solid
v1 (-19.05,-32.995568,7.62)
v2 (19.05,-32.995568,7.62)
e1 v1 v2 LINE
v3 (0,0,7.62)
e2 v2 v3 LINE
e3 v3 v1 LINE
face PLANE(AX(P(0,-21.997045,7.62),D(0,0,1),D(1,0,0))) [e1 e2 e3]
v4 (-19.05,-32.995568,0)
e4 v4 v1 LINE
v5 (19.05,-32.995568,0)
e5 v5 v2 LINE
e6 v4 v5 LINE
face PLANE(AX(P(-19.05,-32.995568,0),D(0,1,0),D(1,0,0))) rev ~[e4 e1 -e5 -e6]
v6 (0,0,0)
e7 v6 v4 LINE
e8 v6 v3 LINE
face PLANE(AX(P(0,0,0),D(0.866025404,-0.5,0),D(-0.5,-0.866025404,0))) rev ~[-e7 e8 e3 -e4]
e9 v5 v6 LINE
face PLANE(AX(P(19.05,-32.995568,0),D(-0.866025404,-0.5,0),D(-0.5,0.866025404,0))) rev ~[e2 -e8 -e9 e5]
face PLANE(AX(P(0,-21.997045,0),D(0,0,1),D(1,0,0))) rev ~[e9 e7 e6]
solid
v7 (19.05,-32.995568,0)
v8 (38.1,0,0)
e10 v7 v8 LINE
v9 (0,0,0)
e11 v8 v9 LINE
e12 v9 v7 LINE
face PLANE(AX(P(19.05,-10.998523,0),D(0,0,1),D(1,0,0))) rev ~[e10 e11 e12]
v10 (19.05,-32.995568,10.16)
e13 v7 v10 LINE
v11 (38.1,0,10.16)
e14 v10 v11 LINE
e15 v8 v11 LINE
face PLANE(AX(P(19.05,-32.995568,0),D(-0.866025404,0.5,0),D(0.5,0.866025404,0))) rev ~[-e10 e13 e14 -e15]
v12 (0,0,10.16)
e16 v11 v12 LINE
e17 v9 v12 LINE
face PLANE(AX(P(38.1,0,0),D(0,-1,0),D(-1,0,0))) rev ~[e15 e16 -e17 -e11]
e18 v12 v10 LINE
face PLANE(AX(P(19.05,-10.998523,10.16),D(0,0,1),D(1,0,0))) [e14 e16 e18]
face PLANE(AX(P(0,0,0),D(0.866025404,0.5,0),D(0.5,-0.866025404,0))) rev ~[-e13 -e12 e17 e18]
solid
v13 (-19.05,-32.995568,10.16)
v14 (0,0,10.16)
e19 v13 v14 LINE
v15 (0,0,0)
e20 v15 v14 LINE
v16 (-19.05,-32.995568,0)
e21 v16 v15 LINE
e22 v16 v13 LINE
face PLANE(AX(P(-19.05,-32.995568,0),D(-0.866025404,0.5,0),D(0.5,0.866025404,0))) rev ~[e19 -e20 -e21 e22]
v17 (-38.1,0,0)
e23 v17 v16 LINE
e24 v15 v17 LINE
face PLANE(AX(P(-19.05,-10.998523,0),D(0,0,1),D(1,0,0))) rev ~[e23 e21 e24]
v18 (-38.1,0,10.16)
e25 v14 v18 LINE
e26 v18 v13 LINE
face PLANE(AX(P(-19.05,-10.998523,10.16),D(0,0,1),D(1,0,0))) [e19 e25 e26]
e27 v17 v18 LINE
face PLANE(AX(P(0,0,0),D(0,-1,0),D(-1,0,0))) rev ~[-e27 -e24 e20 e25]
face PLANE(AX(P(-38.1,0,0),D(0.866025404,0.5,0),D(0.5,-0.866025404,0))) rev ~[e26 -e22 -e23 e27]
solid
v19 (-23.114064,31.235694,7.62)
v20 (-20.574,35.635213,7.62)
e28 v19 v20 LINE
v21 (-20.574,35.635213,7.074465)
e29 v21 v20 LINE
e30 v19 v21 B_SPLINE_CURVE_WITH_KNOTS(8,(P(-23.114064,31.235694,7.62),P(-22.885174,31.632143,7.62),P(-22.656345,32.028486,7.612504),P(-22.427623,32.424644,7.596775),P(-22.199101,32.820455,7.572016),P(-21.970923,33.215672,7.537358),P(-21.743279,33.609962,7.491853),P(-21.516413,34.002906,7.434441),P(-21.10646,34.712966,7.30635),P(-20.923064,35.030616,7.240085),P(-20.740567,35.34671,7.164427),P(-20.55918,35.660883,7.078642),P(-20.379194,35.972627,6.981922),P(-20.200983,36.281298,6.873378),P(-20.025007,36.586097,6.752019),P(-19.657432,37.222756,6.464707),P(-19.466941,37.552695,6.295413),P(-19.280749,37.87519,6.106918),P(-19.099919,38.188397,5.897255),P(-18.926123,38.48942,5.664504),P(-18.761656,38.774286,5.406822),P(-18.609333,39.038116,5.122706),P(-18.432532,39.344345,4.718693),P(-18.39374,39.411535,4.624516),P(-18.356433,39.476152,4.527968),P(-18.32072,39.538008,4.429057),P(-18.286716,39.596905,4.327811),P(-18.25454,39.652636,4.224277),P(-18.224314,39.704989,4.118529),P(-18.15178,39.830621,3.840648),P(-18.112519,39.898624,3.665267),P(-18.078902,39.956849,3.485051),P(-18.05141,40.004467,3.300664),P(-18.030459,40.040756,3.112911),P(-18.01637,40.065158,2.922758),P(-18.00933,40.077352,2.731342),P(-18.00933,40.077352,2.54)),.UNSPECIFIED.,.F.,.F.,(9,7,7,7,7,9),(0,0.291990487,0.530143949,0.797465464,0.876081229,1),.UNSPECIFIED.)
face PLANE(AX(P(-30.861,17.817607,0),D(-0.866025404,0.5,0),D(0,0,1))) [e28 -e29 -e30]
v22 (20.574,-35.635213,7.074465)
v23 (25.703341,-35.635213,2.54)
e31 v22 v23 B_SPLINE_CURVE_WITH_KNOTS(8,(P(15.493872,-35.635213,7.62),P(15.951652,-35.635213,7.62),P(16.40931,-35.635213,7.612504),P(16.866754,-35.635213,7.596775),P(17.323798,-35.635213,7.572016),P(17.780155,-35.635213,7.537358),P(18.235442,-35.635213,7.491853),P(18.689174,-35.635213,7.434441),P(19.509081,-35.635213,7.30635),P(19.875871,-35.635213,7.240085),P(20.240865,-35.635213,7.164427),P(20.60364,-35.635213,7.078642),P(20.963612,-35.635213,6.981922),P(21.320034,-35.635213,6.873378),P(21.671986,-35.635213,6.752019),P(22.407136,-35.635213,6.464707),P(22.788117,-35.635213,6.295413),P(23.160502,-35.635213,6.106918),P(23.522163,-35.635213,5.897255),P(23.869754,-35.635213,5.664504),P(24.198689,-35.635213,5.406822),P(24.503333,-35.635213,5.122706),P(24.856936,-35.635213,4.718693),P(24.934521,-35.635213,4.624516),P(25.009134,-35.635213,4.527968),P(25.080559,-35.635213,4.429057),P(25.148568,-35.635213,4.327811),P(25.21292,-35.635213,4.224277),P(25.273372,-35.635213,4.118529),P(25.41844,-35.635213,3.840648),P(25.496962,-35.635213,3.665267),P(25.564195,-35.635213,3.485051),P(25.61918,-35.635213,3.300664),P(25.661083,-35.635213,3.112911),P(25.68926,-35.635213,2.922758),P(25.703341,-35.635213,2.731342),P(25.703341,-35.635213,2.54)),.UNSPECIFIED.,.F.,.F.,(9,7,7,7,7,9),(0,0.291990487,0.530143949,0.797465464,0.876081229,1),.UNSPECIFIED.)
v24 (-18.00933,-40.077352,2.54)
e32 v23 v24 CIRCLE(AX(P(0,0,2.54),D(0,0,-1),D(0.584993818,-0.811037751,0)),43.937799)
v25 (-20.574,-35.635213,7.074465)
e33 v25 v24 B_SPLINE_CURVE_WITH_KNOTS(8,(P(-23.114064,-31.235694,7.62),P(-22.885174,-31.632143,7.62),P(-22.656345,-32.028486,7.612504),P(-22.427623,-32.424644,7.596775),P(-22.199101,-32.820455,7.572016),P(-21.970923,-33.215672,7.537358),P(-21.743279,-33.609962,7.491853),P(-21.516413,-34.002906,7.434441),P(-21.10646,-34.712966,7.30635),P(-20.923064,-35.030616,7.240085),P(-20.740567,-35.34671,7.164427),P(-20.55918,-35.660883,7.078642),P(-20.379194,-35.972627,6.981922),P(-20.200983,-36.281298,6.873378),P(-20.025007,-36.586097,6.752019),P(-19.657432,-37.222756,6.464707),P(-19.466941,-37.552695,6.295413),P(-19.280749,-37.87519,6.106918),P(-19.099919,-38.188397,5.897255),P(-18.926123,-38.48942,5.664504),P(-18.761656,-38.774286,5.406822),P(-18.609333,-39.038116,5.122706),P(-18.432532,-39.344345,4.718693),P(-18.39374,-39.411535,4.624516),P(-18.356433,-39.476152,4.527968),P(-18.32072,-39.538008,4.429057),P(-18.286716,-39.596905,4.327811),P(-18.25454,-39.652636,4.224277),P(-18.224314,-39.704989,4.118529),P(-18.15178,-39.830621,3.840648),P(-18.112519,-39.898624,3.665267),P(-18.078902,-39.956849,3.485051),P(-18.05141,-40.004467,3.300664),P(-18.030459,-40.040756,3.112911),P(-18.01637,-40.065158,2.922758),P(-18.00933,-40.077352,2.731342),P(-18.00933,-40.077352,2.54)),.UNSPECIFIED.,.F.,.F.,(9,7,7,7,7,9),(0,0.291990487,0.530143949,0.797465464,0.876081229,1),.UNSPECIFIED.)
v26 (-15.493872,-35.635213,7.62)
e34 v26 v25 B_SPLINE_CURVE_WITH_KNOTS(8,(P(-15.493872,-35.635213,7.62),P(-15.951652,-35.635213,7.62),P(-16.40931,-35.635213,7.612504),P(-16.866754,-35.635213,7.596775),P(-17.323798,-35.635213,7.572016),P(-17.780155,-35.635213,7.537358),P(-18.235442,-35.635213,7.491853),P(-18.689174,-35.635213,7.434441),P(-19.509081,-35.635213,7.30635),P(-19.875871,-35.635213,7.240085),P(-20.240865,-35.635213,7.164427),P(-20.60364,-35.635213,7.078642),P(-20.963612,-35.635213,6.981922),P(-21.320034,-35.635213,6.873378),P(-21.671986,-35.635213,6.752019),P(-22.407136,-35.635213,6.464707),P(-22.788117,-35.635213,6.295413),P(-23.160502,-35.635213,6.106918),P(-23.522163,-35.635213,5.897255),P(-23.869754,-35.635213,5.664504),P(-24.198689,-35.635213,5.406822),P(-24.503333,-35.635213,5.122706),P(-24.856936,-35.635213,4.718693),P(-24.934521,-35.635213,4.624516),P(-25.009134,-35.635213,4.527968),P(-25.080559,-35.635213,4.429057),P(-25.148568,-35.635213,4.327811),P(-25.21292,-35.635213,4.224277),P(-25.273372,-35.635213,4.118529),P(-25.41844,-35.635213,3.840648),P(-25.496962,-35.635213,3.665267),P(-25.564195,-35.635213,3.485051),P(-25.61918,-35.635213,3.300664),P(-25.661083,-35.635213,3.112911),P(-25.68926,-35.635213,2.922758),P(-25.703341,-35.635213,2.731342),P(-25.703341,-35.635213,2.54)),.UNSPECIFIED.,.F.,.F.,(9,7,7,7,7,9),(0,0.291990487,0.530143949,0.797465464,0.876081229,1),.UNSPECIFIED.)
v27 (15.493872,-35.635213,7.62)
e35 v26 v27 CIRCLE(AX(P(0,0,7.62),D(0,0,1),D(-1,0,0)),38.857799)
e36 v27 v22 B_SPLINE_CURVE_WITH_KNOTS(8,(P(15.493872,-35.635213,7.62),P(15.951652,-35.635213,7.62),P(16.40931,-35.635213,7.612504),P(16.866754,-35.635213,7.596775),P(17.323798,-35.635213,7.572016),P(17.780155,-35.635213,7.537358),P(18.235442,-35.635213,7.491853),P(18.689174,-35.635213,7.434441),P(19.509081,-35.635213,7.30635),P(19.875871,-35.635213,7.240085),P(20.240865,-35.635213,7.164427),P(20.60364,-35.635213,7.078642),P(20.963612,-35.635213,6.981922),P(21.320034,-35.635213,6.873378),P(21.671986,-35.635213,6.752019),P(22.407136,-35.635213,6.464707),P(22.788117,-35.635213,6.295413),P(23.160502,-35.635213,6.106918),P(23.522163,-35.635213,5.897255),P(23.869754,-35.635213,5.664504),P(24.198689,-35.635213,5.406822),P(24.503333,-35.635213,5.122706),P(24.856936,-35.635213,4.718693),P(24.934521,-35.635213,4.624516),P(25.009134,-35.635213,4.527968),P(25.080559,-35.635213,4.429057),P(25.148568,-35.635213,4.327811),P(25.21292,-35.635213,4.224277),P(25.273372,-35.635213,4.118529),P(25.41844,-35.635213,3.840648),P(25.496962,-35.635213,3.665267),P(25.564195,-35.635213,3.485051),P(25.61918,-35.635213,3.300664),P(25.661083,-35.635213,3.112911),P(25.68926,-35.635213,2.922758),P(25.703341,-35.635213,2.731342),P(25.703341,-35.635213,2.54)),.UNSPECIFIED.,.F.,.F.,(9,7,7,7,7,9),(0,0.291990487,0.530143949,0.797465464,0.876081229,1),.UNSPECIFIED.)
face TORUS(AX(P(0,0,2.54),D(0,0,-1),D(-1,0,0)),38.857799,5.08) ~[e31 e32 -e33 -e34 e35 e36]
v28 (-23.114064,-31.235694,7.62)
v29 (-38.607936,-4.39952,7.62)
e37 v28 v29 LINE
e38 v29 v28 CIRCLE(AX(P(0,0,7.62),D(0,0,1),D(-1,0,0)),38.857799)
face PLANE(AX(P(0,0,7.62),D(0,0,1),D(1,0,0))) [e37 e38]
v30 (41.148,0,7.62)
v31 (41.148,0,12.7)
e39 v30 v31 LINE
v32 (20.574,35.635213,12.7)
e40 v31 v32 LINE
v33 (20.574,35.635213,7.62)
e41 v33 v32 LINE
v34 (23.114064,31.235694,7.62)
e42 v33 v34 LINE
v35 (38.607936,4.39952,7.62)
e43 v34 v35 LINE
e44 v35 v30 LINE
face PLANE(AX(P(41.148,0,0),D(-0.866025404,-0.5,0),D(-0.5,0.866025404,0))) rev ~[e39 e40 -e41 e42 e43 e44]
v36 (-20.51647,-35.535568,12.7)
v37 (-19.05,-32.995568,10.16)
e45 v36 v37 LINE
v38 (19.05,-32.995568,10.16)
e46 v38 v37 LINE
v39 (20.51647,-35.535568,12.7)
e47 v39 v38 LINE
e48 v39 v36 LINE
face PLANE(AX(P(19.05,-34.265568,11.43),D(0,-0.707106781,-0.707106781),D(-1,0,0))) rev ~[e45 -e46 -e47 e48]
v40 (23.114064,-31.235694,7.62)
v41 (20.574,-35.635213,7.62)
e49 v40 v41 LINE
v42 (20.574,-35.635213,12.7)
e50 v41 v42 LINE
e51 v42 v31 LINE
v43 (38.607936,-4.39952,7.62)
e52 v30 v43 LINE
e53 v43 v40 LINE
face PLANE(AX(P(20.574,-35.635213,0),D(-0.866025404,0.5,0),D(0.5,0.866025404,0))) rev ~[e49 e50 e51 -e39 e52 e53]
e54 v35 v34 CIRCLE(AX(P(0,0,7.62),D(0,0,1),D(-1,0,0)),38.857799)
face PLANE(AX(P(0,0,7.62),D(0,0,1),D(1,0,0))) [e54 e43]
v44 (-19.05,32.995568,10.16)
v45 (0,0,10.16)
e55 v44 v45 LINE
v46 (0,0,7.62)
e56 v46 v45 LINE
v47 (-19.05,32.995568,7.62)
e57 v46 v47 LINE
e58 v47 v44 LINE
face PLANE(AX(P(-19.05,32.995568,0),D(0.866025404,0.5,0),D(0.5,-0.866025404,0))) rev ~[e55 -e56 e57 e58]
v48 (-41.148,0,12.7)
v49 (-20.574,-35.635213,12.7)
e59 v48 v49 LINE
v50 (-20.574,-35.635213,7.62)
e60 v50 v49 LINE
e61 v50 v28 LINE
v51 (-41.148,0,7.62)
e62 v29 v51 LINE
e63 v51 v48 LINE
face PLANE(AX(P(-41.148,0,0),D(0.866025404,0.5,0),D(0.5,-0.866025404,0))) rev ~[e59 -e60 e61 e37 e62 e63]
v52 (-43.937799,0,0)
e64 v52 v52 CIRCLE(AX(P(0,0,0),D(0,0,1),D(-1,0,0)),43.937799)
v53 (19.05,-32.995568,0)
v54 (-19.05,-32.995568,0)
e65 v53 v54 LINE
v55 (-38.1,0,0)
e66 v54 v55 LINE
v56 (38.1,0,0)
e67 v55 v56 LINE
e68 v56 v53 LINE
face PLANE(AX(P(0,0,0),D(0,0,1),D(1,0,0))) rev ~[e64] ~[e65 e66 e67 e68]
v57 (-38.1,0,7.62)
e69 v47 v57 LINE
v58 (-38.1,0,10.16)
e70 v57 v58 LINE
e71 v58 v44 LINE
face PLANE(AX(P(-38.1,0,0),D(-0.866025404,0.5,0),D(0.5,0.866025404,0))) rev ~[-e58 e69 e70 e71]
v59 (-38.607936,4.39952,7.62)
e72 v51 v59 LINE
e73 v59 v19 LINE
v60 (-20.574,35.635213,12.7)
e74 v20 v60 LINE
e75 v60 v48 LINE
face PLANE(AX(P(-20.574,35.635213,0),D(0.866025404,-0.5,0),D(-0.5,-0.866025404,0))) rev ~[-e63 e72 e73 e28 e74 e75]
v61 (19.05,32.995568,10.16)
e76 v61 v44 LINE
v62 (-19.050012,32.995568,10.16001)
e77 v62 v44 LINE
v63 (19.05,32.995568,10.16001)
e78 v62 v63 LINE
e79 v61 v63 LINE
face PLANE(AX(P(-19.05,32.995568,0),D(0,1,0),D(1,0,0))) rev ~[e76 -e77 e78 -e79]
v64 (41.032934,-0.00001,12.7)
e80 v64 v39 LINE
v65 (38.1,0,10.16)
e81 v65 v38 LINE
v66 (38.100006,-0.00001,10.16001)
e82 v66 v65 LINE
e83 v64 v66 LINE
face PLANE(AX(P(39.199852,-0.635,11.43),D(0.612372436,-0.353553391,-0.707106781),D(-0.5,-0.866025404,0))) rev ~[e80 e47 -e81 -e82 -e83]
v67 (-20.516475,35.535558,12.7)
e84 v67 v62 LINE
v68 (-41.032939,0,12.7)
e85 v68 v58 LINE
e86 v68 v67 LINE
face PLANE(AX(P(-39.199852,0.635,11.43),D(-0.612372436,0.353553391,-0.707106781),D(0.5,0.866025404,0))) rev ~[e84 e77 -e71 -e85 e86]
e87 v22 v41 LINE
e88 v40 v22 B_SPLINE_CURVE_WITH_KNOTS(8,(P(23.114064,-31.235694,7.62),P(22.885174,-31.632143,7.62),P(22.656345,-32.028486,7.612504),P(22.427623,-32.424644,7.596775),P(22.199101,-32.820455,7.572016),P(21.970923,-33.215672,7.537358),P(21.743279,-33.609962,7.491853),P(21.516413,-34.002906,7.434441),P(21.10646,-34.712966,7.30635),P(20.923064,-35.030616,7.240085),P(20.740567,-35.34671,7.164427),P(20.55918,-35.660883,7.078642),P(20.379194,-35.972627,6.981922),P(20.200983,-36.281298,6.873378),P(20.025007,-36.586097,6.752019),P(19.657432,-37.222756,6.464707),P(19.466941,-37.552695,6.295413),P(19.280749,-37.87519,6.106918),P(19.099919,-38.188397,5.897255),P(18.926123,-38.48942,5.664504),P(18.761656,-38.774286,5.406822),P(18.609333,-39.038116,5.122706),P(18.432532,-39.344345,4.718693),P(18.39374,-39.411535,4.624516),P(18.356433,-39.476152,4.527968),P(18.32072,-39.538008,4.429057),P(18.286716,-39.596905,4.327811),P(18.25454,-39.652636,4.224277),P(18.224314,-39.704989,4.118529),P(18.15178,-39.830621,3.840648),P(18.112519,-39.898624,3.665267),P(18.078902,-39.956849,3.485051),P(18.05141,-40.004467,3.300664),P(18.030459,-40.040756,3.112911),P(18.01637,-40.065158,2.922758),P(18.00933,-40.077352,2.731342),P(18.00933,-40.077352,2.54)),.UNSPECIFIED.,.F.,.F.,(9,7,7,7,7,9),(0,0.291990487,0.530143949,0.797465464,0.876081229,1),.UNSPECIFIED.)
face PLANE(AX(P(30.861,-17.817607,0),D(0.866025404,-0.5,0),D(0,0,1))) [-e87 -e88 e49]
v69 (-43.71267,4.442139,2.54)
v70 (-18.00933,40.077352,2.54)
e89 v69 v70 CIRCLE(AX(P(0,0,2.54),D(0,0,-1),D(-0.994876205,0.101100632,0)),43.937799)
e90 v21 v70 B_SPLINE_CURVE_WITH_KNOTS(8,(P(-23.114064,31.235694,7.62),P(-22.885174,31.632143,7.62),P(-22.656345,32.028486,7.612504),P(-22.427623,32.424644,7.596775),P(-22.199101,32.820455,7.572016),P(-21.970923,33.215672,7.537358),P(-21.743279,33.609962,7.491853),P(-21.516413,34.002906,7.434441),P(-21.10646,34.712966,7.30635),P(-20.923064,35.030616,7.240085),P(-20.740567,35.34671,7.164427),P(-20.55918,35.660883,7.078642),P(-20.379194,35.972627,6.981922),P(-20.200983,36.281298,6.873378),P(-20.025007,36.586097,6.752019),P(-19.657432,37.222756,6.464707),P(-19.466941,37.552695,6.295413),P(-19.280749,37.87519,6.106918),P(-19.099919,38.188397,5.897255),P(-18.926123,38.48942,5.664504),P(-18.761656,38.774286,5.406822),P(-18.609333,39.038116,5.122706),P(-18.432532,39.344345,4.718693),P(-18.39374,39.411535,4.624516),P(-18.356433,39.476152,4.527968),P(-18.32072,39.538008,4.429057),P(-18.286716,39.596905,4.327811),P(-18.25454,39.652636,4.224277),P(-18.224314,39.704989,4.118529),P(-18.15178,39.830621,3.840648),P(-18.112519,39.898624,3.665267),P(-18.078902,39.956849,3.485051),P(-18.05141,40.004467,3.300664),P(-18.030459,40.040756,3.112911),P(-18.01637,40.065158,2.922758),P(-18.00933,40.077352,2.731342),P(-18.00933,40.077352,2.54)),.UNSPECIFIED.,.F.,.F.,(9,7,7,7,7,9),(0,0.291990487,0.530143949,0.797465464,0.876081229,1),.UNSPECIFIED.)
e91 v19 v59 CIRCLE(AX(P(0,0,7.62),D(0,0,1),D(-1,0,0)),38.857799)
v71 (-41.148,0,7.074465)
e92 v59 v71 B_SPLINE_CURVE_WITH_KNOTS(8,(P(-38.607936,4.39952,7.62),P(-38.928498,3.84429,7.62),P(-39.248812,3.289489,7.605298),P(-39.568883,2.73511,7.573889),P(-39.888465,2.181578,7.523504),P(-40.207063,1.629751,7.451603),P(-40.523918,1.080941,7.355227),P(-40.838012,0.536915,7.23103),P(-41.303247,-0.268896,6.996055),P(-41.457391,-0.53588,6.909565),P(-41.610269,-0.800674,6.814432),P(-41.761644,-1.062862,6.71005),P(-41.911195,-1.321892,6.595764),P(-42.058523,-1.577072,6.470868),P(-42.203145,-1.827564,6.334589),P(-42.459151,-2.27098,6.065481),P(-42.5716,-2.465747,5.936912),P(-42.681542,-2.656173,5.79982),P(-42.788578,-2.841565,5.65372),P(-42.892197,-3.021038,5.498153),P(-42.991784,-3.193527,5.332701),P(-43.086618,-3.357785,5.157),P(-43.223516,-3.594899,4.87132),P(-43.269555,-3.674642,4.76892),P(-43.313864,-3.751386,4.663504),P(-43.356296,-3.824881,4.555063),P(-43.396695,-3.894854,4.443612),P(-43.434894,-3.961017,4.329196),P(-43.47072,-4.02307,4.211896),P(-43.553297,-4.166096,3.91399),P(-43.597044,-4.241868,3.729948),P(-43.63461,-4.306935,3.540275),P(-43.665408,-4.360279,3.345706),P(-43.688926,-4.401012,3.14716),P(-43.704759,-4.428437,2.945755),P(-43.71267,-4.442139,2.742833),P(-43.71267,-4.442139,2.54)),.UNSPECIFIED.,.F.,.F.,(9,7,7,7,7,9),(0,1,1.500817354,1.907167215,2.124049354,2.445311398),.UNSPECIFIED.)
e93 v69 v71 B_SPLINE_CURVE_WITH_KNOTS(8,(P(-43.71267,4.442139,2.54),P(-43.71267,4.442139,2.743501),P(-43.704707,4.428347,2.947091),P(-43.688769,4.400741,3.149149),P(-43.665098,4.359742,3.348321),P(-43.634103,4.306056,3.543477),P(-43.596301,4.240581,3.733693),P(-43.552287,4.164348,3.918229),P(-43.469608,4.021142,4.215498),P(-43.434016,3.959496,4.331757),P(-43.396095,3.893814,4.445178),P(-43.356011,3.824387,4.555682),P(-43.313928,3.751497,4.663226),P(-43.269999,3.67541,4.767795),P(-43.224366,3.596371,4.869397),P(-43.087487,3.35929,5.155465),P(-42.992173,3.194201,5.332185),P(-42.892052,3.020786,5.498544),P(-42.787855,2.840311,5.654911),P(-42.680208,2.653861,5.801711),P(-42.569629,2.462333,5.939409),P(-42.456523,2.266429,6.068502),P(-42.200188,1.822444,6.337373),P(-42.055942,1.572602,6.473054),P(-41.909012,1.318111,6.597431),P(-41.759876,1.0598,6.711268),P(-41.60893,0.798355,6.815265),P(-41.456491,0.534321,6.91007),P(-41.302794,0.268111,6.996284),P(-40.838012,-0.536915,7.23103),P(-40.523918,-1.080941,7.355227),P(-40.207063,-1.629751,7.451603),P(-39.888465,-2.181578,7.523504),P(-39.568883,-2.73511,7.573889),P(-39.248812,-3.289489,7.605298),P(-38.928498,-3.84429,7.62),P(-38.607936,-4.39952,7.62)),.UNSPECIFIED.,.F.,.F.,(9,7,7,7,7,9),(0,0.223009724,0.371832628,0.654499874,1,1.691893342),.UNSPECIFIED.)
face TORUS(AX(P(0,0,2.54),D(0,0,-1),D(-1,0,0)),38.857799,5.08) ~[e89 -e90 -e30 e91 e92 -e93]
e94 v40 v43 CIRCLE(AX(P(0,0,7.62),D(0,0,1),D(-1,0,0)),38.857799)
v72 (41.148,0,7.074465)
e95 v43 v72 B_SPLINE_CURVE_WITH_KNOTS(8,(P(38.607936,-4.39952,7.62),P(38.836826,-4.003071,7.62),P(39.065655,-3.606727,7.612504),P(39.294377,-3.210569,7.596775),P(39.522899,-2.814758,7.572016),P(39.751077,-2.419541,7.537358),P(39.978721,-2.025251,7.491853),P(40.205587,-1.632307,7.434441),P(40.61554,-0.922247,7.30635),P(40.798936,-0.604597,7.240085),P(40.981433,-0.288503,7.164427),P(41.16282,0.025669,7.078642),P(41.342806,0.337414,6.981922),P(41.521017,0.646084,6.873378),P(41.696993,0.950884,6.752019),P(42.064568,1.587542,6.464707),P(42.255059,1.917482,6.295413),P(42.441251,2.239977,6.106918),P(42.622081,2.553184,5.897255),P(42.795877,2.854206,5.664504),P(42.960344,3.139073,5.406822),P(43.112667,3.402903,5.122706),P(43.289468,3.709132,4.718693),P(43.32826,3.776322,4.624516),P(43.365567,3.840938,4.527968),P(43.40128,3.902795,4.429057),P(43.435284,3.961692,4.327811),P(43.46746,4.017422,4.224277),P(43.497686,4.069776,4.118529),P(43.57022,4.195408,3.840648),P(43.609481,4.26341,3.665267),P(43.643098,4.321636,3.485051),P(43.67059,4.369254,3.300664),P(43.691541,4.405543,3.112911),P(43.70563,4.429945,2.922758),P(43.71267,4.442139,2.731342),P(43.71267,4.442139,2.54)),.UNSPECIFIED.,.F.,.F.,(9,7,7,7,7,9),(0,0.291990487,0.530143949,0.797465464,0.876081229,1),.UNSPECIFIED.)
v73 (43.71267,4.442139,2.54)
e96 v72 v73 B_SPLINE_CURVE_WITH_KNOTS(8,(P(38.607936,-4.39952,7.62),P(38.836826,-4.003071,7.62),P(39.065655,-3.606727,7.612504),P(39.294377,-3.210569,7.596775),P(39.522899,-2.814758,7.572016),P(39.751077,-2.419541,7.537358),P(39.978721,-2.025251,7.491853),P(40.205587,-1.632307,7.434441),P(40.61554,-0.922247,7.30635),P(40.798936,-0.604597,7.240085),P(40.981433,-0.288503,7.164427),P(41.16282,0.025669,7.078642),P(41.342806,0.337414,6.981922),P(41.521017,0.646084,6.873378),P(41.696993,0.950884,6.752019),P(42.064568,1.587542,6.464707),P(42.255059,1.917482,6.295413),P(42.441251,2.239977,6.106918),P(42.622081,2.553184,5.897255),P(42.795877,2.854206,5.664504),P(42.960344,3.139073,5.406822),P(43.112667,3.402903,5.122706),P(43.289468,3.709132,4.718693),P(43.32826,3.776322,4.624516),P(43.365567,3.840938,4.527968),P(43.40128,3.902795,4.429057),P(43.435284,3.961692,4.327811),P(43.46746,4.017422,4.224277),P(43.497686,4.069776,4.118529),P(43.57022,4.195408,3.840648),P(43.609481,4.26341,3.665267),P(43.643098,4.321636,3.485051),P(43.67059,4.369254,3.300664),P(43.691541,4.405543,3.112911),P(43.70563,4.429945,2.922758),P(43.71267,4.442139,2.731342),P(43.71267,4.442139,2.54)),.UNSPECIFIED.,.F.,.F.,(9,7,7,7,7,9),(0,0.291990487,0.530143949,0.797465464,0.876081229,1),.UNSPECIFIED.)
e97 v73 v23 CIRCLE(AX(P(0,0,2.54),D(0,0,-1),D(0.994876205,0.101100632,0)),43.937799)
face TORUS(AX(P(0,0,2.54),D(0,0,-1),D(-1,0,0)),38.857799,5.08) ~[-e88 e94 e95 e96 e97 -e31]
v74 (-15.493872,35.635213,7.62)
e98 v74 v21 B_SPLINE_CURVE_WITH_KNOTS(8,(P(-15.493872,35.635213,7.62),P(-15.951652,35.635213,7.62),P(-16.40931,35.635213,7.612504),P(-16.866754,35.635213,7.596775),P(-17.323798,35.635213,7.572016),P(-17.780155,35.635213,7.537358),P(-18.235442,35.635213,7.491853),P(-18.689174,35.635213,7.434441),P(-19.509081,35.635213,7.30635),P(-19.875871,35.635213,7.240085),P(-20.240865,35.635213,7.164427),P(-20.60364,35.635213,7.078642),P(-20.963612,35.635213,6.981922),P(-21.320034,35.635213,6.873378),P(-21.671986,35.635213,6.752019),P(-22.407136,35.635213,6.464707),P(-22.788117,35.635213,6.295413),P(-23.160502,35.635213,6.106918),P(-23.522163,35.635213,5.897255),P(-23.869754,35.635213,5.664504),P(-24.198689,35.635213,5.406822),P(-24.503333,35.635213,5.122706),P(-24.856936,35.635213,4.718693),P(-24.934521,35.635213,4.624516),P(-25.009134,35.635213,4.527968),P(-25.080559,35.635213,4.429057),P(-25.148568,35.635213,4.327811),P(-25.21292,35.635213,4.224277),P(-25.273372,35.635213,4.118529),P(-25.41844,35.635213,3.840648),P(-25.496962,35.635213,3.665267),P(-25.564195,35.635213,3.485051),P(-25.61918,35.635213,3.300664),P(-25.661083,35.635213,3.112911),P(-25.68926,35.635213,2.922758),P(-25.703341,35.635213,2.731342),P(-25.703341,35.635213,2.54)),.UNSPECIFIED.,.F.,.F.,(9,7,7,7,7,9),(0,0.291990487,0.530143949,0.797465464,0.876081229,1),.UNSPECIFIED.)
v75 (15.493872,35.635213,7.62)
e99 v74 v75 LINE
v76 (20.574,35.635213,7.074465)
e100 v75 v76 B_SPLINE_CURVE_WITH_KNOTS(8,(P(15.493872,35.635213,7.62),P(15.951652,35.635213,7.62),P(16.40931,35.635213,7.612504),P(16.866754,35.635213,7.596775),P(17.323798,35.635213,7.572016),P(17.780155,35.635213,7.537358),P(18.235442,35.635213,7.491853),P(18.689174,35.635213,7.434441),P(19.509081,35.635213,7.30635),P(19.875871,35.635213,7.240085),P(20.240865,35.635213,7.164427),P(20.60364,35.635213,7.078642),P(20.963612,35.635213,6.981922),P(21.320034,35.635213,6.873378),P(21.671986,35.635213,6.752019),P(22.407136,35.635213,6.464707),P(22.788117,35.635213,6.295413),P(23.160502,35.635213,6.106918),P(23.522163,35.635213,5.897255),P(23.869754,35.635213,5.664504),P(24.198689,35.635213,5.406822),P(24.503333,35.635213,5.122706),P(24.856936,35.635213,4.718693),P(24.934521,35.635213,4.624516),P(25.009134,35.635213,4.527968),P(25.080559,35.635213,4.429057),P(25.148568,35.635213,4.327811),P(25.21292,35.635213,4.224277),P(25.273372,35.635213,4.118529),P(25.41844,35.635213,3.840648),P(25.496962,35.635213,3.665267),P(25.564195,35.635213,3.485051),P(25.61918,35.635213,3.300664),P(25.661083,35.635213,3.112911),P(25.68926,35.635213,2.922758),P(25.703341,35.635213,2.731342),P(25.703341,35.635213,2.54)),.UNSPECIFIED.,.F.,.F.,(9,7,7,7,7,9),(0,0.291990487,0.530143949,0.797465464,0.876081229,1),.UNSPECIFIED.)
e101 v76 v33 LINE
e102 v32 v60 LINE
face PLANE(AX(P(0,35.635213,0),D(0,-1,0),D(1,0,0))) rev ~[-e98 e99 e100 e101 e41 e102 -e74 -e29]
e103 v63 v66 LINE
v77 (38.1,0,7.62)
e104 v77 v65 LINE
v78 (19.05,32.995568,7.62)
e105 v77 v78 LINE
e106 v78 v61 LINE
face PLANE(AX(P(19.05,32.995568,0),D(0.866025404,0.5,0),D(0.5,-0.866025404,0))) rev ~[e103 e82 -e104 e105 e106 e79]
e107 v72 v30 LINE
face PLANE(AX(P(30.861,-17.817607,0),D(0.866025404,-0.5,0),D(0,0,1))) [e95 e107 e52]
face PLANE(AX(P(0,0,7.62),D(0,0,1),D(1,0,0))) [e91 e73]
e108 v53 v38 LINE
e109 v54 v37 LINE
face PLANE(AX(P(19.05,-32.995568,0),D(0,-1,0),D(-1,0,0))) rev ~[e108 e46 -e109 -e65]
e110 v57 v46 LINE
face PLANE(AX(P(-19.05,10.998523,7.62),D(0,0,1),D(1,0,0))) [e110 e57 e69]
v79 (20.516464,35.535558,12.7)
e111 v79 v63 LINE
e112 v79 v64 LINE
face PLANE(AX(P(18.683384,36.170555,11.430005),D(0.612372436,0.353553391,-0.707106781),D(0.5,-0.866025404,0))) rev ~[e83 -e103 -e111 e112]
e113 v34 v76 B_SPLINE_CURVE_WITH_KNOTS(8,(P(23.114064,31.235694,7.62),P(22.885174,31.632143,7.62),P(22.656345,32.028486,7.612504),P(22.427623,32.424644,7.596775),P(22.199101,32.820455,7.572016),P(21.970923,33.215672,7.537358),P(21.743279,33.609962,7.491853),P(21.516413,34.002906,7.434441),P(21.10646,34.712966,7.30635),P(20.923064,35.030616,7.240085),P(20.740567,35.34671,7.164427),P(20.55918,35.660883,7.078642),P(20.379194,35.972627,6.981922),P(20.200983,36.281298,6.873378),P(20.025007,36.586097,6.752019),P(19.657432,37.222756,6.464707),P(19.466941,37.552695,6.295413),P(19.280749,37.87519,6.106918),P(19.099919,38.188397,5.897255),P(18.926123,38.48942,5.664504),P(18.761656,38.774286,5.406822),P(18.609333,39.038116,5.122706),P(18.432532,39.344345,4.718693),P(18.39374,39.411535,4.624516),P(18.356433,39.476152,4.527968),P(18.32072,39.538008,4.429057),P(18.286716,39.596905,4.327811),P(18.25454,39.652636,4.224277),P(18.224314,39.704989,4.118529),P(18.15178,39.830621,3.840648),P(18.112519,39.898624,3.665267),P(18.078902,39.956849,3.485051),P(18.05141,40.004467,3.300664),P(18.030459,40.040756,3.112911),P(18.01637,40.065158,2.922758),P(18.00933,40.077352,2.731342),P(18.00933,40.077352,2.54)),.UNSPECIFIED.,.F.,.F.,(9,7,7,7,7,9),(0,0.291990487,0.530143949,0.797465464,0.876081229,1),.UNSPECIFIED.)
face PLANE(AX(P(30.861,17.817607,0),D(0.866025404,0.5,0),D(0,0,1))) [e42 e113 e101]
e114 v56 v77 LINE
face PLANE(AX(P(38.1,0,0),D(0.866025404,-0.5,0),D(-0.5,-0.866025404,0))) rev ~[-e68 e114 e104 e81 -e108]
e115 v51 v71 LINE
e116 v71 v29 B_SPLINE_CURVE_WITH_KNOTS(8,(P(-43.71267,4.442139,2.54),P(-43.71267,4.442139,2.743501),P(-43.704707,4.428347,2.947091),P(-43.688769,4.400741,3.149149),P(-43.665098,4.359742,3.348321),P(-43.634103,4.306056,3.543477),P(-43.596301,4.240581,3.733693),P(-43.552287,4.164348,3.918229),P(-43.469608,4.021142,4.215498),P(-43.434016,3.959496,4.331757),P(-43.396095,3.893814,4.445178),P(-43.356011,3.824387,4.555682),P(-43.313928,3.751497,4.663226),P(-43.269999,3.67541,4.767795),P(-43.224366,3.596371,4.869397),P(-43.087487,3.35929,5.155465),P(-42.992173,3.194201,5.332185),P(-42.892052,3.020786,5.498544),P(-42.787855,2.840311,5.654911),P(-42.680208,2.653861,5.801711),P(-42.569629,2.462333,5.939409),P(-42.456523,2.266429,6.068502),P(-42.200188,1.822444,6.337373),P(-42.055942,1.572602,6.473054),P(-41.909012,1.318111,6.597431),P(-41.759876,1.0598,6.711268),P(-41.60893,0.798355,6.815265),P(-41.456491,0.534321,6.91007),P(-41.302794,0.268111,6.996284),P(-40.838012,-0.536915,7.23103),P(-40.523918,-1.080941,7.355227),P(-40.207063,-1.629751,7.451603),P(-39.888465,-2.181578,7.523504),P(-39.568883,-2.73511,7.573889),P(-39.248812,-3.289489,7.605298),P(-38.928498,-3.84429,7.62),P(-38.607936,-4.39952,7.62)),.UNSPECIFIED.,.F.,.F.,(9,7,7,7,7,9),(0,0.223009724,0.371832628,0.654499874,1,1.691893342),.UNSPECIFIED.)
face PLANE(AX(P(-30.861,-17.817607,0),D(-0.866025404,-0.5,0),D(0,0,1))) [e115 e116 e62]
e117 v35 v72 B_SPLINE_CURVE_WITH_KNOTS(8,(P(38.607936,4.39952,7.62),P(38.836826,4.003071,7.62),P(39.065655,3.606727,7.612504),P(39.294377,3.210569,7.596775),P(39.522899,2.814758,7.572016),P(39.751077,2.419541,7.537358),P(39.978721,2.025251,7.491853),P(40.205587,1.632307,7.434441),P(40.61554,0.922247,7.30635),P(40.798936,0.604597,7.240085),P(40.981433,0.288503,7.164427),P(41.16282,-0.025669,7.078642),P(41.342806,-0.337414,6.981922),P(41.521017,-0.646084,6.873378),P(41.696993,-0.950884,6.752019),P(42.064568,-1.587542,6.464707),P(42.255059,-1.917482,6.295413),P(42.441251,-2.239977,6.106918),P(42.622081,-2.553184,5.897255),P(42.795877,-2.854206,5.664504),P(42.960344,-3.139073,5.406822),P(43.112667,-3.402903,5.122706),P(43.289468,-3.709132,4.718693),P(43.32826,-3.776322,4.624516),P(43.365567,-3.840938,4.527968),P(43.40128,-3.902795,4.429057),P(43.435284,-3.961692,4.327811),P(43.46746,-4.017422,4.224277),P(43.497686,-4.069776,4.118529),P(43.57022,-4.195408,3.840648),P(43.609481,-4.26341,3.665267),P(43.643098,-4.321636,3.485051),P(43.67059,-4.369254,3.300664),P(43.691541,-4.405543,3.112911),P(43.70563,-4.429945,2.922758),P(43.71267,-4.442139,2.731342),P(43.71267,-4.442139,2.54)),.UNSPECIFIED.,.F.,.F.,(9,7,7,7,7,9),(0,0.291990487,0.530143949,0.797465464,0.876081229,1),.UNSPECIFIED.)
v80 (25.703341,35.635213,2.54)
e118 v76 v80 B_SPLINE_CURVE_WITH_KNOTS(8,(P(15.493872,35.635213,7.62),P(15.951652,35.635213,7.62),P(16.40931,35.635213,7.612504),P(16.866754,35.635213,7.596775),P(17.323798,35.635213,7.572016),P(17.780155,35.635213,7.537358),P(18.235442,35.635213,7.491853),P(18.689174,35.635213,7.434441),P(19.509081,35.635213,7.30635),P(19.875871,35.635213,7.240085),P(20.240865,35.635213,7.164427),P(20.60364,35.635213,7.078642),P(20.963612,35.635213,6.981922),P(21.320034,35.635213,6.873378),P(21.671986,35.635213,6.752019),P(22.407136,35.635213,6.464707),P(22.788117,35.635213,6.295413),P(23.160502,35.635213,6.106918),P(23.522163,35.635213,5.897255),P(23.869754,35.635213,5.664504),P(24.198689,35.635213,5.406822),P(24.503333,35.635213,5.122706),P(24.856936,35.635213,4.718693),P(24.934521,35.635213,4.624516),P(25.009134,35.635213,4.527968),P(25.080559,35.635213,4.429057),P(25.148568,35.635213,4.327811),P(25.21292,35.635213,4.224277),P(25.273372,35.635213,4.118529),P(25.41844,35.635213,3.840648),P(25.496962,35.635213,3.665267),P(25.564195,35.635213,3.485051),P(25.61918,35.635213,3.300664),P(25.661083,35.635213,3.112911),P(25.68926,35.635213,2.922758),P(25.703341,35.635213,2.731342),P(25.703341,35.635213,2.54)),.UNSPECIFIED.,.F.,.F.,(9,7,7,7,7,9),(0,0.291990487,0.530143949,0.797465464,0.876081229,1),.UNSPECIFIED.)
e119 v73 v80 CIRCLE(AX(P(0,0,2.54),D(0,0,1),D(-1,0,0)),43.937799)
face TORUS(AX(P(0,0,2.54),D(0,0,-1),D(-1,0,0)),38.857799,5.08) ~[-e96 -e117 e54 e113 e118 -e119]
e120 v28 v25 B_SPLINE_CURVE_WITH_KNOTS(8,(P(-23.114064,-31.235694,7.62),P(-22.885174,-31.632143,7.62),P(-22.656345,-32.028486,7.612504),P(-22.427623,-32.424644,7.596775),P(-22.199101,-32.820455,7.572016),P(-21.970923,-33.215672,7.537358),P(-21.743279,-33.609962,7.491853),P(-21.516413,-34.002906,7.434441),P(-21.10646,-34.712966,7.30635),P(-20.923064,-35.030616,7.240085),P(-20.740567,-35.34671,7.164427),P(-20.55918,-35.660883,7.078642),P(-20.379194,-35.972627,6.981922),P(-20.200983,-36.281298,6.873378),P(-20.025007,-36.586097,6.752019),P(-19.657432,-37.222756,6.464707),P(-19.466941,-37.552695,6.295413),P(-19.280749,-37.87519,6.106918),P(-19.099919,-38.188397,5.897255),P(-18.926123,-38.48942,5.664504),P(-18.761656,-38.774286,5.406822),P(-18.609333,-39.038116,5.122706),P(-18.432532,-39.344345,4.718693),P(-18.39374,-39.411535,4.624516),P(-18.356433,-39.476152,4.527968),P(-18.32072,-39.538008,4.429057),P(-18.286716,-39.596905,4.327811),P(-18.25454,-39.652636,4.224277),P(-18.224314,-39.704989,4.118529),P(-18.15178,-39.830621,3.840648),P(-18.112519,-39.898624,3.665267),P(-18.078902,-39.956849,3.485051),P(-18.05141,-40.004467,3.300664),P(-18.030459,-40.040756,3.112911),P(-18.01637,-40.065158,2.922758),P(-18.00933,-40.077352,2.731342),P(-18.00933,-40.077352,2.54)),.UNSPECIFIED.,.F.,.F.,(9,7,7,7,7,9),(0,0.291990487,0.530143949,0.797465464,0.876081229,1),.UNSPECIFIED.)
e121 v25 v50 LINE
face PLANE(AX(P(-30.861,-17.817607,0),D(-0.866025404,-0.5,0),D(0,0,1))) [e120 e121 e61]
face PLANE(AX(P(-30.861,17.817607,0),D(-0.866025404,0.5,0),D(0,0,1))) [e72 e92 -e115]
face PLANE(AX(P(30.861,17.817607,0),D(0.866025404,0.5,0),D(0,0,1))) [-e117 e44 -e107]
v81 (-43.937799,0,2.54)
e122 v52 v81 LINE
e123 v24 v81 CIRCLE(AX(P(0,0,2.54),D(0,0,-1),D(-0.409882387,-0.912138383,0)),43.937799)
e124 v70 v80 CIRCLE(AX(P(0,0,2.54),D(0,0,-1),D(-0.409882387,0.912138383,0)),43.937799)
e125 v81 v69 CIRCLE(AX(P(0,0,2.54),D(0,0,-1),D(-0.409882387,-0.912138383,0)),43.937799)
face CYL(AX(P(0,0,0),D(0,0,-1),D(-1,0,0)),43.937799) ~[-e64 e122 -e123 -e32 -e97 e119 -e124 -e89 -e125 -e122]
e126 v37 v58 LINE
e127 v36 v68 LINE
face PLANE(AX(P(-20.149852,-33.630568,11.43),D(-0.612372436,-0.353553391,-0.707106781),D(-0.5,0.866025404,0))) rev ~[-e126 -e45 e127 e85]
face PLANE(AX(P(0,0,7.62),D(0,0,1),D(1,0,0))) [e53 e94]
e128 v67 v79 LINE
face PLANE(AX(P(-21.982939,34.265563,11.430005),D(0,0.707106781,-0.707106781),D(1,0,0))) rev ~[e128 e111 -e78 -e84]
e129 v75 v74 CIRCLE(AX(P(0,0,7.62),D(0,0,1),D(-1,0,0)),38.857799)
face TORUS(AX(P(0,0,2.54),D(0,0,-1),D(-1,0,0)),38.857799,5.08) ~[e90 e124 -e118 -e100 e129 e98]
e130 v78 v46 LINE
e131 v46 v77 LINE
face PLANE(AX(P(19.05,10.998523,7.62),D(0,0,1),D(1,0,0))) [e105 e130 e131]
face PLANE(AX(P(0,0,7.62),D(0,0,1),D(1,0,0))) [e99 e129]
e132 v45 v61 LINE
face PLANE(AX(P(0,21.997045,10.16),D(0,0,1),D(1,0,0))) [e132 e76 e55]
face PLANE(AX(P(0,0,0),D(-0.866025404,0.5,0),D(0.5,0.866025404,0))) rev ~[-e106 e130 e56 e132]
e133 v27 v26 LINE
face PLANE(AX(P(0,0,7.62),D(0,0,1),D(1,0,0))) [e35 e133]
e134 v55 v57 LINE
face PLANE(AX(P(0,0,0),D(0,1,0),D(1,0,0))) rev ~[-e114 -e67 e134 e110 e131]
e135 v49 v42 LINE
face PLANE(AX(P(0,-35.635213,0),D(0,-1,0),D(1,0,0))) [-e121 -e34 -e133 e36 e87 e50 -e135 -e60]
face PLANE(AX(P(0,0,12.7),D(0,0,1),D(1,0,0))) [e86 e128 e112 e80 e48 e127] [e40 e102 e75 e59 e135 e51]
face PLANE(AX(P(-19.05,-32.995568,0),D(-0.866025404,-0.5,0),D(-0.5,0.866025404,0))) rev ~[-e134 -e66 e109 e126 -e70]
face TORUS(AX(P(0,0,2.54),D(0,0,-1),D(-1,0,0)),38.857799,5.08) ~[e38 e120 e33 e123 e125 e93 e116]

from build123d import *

# Parameters (mm, degrees)
F1_DEPTH = 12.7
F2_DEPTH = 10.16
F3_DEPTH = 7.62
F4_DEPTH = 7.62
F5_DEPTH = 10.16
F6_DEPTH = 7.62
F7_DEPTH = 10.16
F8_DEPTH = 7.62
F10_SIZE = 2.54
F11_SIZE = 2.53999
F12_SIZE = 2.53999


# Not quite as in the source:
# - a fillet or chamfer that OpenCascade refuses, or shapes differently, is made with other operations: its cross-section is extruded or revolved along the edge and cut away or added
# - a fillet or chamfer is up to 0.001 mm smaller than in the source, because OpenCascade refuses the exact size


with BuildPart() as f1:
    # F0 (on Top) → F1 (new body)
    with BuildSketch(Plane.XY):
        Polygon((-20.574, 35.6352133149), (-41.148, 0), (-20.574, -35.6352133149), (20.574, -35.6352133149), (41.148, 0), (20.574, 35.6352133149), align=None)
        Polygon((38.1, 0), (19.05, -32.9955678842), (-19.05, -32.9955678842), (-38.1, 0), (-19.05, 32.9955678842), (19.05, 32.9955678842), align=None, mode=Mode.SUBTRACT)
    extrude(amount=F1_DEPTH)

    # F0 (on Top) → F2 (join)
    with BuildSketch(Plane.XY):
        Polygon((-19.05, 32.9955678842), (0, 0), (19.05, 32.9955678842), align=None)
    extrude(amount=F2_DEPTH)

    # F0 (on Top) → F3 (join)
    with BuildSketch(Plane.XY):
        Polygon((-38.1, 0), (0, 0), (-19.05, 32.9955678842), align=None)
    extrude(amount=F3_DEPTH)

    # F0 (on Top) → F4 (join)
    with BuildSketch(Plane.XY):
        Polygon((0, 0), (38.1, 0), (19.05, 32.9955678842), align=None)
    extrude(amount=F4_DEPTH)

    # F0 (on Top) → F8 (join)
    with BuildSketch(Plane.XY):
        with BuildLine():
            ThreePointArc((43.9377985476, 0), (0, 43.9377985476), (-43.9377985476, 0))
            ThreePointArc((-43.9377985476, 0), (0, -43.9377985476), (43.9377985476, 0))
        make_face()
        with BuildLine():
            ThreePointArc((-20.574, -35.6352133149), (-35.6352133149, -20.574), (-41.148, 0))
            ThreePointArc((-41.148, 0), (-35.6352133149, 20.574), (-20.574, 35.6352133149))
            ThreePointArc((-20.574, 35.6352133149), (-10.6498860679, 39.7459159001), (0, 41.148))
            ThreePointArc((0, 41.148), (10.6498860679, 39.7459159001), (20.574, 35.6352133149))
            ThreePointArc((20.574, 35.6352133149), (35.6352133149, 20.574), (41.148, 0))
            ThreePointArc((41.148, 0), (35.6352133149, -20.574), (20.574, -35.6352133149))
            ThreePointArc((20.574, -35.6352133149), (0, -41.148), (-20.574, -35.6352133149))
        make_face(mode=Mode.SUBTRACT)
        with BuildLine():
            Line((-20.574, -35.6352133149), (-41.148, 0))
            ThreePointArc((-41.148, 0), (-35.6352133149, -20.574), (-20.574, -35.6352133149))
        make_face()
        with BuildLine():
            Line((20.574, -35.6352133149), (-20.574, -35.6352133149))
            ThreePointArc((-20.574, -35.6352133149), (0, -41.148), (20.574, -35.6352133149))
        make_face()
        with BuildLine():
            Line((41.148, 0), (20.574, -35.6352133149))
            ThreePointArc((20.574, -35.6352133149), (35.6352133149, -20.574), (41.148, 0))
        make_face()
        with BuildLine():
            ThreePointArc((41.148, 0), (35.6352133149, 20.574), (20.574, 35.6352133149))
            Line((20.574, 35.6352133149), (41.148, 0))
        make_face()
        with BuildLine():
            ThreePointArc((0, 41.148), (-10.6498860679, 39.7459159001), (-20.574, 35.6352133149))
            Line((-20.574, 35.6352133149), (20.574, 35.6352133149))
            ThreePointArc((20.574, 35.6352133149), (10.6498860679, 39.7459159001), (0, 41.148))
        make_face()
        with BuildLine():
            ThreePointArc((-20.574, 35.6352133149), (-35.6352133149, 20.574), (-41.148, 0))
            Line((-41.148, 0), (-20.574, 35.6352133149))
        make_face()
    extrude(amount=F8_DEPTH)

    # F9: fillet of radius 5.08 on 1 edges, made by hand


with BuildPart() as f5:
    # F0 (on Top) → F5 (new body)
    with BuildSketch(Plane.XY):
        Polygon((0, 0), (19.05, -32.9955678842), (38.1, 0), align=None)
    extrude(amount=F5_DEPTH)


with BuildPart() as f6:
    # F0 (on Top) → F6 (new body)
    with BuildSketch(Plane.XY):
        Polygon((-19.05, -32.9955678842), (19.05, -32.9955678842), (0, 0), align=None)
    extrude(amount=F6_DEPTH)


with BuildPart() as f7:
    # F0 (on Top) → F7 (new body)
    with BuildSketch(Plane.XY):
        Polygon((-38.1, 0), (-19.05, -32.9955678842), (0, 0), align=None)
    extrude(amount=F7_DEPTH)


with BuildPart() as f9_tool2:
    # F9_s3 → F9_t4 (revolve)
    with BuildSketch(Plane.XZ):
        with BuildLine():
            ThreePointArc((-38.8577985476, 7.62), (-42.449900996, 6.1321024484), (-43.9377985476, 2.54))
            Line((-43.9377985476, 2.54), (-43.9377985476, 7.62))
            Line((-43.9377985476, 7.62), (-38.8577985476, 7.62))
        make_face()
    revolve(axis=Axis((0, 0, 7.62), (0, 0, 1)))

    split(bisect_by=Plane(origin=(-30.861, -17.8176066575, 0), x_dir=(0, 0, 1), z_dir=(-0.8660254038, -0.5, 0)), keep=Keep.TOP)


with BuildPart() as f1_1:
    add(f1.part)

    # F9_t1: cut F9_tool2
    add(f9_tool2.part, mode=Mode.SUBTRACT)


with BuildPart() as f9_tool7:
    # F9_s8 → F9_t9 (revolve)
    with BuildSketch(Plane.XZ):
        with BuildLine():
            ThreePointArc((-38.8577985476, 7.62), (-42.449900996, 6.1321024484), (-43.9377985476, 2.54))
            Line((-43.9377985476, 2.54), (-43.9377985476, 7.62))
            Line((-43.9377985476, 7.62), (-38.8577985476, 7.62))
        make_face()
    revolve(axis=Axis((0, 0, 7.62), (0, 0, 1)))

    split(bisect_by=Plane(origin=(-30.861, 17.8176066575, 0), x_dir=(0, 0, 1), z_dir=(-0.8660254038, 0.5, 0)), keep=Keep.TOP)


with BuildPart() as f1_2:
    add(f1_1.part)

    # F9_t6: cut F9_tool7
    add(f9_tool7.part, mode=Mode.SUBTRACT)


with BuildPart() as f9_tool12:
    # F9_s13 → F9_t14 (revolve)
    with BuildSketch(Plane.XZ):
        with BuildLine():
            ThreePointArc((-38.8577985476, 7.62), (-42.449900996, 6.1321024484), (-43.9377985476, 2.54))
            Line((-43.9377985476, 2.54), (-43.9377985476, 7.62))
            Line((-43.9377985476, 7.62), (-38.8577985476, 7.62))
        make_face()
    revolve(axis=Axis((0, 0, 7.62), (0, 0, 1)))

    split(bisect_by=Plane.XZ.offset(35.6352133149), keep=Keep.TOP)


with BuildPart() as f1_3:
    add(f1_2.part)

    # F9_t11: cut F9_tool12
    add(f9_tool12.part, mode=Mode.SUBTRACT)


with BuildPart() as f9_tool17:
    # F9_s18 → F9_t19 (revolve)
    with BuildSketch(Plane.XZ):
        with BuildLine():
            ThreePointArc((-38.8577985476, 7.62), (-42.449900996, 6.1321024484), (-43.9377985476, 2.54))
            Line((-43.9377985476, 2.54), (-43.9377985476, 7.62))
            Line((-43.9377985476, 7.62), (-38.8577985476, 7.62))
        make_face()
    revolve(axis=Axis((0, 0, 7.62), (0, 0, 1)))

    split(bisect_by=Plane.XZ.offset(-35.6352133149), keep=Keep.BOTTOM)


with BuildPart() as f1_4:
    add(f1_3.part)

    # F9_t16: cut F9_tool17
    add(f9_tool17.part, mode=Mode.SUBTRACT)


with BuildPart() as f9_tool22:
    # F9_s23 → F9_t24 (revolve)
    with BuildSketch(Plane.XZ):
        with BuildLine():
            ThreePointArc((-38.8577985476, 7.62), (-42.449900996, 6.1321024484), (-43.9377985476, 2.54))
            Line((-43.9377985476, 2.54), (-43.9377985476, 7.62))
            Line((-43.9377985476, 7.62), (-38.8577985476, 7.62))
        make_face()
    revolve(axis=Axis((0, 0, 7.62), (0, 0, 1)))

    split(bisect_by=Plane(origin=(30.861, -17.8176066575, 0), x_dir=(0, 0, 1), z_dir=(0.8660254038, -0.5, 0)), keep=Keep.TOP)


with BuildPart() as f1_5:
    add(f1_4.part)

    # F9_t21: cut F9_tool22
    add(f9_tool22.part, mode=Mode.SUBTRACT)


with BuildPart() as f9_tool27:
    # F9_s28 → F9_t29 (revolve)
    with BuildSketch(Plane.XZ):
        with BuildLine():
            ThreePointArc((-38.8577985476, 7.62), (-42.449900996, 6.1321024484), (-43.9377985476, 2.54))
            Line((-43.9377985476, 2.54), (-43.9377985476, 7.62))
            Line((-43.9377985476, 7.62), (-38.8577985476, 7.62))
        make_face()
    revolve(axis=Axis((0, 0, 7.62), (0, 0, 1)))

    split(bisect_by=Plane(origin=(30.861, 17.8176066575, 0), x_dir=(0, 0, 1), z_dir=(0.8660254038, 0.5, 0)), keep=Keep.TOP)


with BuildPart() as f1_6:
    add(f1_5.part)

    # F9_t26: cut F9_tool27
    add(f9_tool27.part, mode=Mode.SUBTRACT)

    # F10
    f10_edges = [f1_6.edges().sort_by_distance(p)[0] for p in [
        (-28.575, 16.497784, 12.7),
        (28.575, -16.497784, 12.7),
        (0, -32.995568, 12.7),
        (-28.575, -16.497784, 12.7),
    ]]
    chamfer(f10_edges, length=F10_SIZE)

    # F11 (size 2.54 in the source; OpenCascade refuses exactly that, so slightly less here)
    f11_edges = [f1_6.edges().sort_by_distance(p)[0] for p in [
        (0, 32.995568, 12.7),
    ]]
    chamfer(f11_edges, length=F11_SIZE)

    # F12 (size 2.54 in the source; OpenCascade refuses exactly that, so slightly less here)
    f12_edges = [f1_6.edges().sort_by_distance(p)[0] for p in [
        (28.575, 16.497784, 12.7),
    ]]
    chamfer(f12_edges, length=F12_SIZE)


solid = Compound([f5.part, f6.part, f7.part, f1_6.part])
